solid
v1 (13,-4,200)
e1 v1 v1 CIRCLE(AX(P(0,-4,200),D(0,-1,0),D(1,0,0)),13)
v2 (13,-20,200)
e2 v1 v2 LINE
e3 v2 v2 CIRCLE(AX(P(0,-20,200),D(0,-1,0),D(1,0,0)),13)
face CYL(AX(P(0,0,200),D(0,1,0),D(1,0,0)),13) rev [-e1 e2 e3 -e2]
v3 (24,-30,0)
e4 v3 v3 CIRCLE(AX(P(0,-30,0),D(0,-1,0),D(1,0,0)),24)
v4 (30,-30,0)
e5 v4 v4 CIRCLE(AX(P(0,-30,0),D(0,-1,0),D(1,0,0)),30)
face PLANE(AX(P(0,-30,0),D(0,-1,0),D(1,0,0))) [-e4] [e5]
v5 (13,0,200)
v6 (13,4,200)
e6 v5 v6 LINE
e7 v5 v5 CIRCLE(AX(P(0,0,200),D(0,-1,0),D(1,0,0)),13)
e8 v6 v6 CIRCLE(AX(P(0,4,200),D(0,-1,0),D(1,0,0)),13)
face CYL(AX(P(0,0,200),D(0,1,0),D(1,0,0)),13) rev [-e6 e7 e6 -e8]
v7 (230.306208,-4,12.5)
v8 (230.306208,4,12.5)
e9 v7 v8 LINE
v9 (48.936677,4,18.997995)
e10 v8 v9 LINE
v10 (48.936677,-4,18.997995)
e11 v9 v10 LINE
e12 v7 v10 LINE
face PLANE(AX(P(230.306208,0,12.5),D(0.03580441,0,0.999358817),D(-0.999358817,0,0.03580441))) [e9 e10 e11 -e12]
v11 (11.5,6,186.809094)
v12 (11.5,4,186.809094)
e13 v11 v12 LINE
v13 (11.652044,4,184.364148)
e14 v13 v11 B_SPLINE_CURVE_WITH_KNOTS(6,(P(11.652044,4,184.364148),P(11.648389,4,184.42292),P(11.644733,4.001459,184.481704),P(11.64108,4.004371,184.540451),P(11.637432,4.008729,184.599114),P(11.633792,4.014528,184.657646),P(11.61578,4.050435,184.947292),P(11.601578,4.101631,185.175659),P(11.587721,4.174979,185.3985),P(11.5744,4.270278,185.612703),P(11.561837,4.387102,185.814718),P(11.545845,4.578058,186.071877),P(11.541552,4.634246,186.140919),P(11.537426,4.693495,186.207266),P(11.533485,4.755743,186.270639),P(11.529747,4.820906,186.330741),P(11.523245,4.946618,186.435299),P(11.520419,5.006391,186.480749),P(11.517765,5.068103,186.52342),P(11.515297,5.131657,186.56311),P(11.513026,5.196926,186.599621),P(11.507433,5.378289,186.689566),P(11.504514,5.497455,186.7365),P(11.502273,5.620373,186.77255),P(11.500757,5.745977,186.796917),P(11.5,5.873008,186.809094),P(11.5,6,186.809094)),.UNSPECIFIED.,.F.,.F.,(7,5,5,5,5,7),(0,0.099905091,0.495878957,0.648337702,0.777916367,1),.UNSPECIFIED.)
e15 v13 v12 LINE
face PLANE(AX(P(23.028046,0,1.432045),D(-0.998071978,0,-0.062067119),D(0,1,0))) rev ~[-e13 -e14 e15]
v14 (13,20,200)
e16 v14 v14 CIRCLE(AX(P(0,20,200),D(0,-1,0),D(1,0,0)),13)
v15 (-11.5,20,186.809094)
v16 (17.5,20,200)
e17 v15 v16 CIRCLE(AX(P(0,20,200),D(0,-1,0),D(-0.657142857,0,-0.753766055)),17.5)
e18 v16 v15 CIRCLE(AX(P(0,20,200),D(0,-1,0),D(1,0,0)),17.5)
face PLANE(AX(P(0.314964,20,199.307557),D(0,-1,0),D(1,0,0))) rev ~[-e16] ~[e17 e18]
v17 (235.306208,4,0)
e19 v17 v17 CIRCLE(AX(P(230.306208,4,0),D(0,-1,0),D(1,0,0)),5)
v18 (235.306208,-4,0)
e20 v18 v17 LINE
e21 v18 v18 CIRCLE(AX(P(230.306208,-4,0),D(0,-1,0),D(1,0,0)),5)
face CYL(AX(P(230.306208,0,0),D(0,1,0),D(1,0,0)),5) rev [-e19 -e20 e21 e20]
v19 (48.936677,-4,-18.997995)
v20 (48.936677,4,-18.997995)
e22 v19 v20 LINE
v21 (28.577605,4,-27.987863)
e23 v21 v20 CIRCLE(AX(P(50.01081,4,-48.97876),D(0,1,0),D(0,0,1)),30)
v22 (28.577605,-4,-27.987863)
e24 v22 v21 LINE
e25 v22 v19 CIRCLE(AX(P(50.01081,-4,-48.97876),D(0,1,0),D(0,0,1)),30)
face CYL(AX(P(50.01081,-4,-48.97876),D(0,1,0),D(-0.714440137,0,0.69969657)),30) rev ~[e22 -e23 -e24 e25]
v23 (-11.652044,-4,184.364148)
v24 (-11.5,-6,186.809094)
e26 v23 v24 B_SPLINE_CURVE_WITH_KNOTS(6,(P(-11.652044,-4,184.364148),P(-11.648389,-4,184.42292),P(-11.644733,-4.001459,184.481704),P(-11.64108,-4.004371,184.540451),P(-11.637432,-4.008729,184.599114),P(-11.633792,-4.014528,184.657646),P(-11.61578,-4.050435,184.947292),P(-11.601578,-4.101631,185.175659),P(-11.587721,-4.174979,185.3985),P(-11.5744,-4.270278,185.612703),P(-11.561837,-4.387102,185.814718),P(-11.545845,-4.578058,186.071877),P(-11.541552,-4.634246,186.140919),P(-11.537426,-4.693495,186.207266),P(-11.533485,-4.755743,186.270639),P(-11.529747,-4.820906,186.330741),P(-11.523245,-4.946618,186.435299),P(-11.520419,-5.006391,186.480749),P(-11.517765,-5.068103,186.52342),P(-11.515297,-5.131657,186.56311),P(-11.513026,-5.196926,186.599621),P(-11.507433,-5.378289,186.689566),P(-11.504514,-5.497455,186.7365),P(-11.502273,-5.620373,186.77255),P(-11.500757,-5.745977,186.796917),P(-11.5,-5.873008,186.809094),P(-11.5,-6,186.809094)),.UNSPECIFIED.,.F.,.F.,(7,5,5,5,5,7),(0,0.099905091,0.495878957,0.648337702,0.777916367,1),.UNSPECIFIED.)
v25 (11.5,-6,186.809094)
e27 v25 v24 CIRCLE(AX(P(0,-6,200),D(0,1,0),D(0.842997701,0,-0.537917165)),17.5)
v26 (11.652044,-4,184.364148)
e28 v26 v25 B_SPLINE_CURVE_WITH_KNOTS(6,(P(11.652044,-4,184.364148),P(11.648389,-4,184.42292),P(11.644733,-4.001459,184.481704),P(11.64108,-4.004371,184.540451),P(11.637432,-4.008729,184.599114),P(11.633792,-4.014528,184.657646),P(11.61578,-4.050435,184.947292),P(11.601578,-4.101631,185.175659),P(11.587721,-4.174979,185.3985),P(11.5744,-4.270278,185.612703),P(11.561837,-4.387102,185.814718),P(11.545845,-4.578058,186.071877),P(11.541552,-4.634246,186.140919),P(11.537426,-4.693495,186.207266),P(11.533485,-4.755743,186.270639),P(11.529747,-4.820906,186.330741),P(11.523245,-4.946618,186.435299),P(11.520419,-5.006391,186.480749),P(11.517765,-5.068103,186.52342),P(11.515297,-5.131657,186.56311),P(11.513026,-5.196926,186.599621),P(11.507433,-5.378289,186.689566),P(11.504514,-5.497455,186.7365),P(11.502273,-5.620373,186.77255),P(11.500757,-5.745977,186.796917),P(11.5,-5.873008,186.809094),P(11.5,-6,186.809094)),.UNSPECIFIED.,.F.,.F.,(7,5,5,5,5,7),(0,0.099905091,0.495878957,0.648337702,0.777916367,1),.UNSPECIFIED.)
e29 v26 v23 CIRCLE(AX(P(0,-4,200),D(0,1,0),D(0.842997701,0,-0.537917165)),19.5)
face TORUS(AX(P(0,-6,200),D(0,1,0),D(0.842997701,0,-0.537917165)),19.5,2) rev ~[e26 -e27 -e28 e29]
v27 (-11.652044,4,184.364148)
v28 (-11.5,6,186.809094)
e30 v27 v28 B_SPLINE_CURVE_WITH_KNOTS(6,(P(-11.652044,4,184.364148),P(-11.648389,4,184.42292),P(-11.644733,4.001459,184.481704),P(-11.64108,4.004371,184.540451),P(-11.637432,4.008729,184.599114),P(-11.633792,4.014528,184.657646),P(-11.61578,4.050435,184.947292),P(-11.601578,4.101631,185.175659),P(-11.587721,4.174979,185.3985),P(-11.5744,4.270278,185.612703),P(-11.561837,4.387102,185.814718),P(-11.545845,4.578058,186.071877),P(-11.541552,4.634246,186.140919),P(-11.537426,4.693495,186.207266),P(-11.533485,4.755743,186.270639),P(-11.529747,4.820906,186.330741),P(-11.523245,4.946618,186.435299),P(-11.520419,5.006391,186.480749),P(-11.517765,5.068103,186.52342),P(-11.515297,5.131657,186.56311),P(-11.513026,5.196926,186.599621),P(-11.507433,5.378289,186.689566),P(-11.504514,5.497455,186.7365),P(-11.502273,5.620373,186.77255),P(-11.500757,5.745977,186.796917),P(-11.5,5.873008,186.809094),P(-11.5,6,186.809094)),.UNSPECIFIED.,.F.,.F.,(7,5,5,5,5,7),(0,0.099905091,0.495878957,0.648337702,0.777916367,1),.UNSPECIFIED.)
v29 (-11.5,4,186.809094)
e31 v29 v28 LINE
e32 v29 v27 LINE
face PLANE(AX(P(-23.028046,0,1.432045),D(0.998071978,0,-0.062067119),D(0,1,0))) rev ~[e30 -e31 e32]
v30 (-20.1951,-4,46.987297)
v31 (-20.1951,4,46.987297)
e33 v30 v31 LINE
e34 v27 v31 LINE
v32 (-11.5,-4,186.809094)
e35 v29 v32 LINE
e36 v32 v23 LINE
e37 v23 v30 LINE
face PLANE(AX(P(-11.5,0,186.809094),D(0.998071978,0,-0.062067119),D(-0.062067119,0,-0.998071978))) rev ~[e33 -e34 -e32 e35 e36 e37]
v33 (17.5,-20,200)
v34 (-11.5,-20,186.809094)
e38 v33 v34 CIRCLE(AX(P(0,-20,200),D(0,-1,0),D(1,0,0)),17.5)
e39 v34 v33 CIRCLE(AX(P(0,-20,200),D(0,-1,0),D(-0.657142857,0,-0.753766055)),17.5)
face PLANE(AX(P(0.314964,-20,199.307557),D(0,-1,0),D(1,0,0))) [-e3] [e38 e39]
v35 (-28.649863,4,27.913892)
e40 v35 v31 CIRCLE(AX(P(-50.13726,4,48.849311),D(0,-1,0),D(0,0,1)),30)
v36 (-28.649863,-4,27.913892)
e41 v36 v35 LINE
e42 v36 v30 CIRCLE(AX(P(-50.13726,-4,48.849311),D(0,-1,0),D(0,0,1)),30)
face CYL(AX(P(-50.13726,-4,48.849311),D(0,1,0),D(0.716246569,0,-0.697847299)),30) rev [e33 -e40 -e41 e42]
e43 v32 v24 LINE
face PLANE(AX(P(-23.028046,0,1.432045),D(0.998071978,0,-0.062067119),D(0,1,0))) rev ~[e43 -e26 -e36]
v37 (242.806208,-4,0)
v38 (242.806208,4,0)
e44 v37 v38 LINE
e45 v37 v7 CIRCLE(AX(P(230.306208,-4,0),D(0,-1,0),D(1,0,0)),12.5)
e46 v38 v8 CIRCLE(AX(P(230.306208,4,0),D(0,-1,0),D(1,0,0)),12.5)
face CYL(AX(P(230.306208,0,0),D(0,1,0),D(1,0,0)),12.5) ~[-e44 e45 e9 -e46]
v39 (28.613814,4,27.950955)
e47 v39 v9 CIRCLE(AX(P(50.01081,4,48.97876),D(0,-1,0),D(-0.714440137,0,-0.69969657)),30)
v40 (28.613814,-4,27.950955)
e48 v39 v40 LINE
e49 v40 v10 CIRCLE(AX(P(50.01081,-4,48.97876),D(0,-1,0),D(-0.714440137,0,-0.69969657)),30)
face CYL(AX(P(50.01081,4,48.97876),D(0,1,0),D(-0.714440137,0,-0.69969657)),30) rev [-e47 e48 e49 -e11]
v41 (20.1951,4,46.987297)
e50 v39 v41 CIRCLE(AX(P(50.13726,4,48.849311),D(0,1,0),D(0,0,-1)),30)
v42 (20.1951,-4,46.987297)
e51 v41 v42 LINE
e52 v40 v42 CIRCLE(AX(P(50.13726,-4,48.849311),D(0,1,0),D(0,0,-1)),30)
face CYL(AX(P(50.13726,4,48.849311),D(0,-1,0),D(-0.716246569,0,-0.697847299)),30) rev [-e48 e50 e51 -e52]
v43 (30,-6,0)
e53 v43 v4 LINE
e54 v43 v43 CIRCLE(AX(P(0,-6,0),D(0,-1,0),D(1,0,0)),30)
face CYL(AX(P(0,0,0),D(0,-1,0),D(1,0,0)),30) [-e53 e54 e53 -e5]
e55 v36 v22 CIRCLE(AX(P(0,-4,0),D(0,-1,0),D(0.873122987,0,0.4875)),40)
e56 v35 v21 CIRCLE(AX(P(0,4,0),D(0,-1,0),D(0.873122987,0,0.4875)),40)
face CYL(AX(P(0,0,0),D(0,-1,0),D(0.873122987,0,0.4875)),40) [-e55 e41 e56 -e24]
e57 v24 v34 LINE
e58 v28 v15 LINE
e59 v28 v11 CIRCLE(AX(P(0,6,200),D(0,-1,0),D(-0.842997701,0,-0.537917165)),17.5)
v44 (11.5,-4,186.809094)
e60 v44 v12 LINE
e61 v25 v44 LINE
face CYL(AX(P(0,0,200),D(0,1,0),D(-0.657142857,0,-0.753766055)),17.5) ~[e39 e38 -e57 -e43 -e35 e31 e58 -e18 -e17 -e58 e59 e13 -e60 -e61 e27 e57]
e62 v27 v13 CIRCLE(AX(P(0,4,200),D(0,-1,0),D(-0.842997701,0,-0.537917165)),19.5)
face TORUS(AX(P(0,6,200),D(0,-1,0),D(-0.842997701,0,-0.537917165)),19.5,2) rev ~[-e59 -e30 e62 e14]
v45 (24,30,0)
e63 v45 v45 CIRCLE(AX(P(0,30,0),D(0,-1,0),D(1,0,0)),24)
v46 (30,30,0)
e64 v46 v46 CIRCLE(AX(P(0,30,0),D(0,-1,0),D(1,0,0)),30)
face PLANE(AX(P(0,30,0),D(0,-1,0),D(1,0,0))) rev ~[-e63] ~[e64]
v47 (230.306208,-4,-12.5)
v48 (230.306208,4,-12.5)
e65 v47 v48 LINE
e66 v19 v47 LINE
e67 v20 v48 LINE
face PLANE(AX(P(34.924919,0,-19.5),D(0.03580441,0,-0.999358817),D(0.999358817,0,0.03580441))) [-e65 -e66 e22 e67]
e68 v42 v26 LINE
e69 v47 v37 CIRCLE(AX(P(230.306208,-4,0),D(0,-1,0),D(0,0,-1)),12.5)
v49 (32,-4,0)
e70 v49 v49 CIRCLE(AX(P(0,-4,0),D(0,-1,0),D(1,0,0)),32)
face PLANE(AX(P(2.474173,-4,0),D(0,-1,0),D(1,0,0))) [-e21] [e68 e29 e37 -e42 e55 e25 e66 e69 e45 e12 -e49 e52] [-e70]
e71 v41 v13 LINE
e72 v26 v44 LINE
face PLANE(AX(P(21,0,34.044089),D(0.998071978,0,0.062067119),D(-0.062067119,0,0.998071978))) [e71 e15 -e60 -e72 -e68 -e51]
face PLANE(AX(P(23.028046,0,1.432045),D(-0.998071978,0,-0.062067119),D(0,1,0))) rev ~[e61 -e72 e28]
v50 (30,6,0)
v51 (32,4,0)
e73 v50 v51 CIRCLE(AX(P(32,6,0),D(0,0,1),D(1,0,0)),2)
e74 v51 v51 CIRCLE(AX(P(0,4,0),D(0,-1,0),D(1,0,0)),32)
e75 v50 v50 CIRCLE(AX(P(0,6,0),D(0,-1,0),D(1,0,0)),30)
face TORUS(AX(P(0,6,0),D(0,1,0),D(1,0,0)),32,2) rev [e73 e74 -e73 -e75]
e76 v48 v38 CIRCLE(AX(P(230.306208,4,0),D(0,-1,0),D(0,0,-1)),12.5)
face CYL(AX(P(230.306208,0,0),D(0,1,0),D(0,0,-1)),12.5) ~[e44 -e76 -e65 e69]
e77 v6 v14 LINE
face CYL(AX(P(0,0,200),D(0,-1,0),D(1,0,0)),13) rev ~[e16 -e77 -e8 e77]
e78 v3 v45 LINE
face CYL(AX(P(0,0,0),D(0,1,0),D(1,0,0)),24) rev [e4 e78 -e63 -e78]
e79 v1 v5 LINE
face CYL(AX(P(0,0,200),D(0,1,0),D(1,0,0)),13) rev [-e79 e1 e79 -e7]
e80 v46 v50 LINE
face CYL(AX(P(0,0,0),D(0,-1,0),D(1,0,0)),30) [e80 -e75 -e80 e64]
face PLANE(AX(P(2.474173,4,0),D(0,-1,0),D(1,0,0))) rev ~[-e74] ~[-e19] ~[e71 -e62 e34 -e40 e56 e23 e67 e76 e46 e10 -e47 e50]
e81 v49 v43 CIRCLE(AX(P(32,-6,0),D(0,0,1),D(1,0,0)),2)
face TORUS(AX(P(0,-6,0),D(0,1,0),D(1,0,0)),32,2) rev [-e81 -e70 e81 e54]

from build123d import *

# Parameters (mm, degrees)
F0_R          = 30
F0_R_2        = 5
F0_R_3        = 13
F1_DEPTH      = 4
F2_R          = 30
F3_T1_DEPTH   = 8
F4_R          = 30
F5_R          = 30
F7_DEPTH      = 20
F6_R          = 30
F6_R_2        = 24
F8_DEPTH      = 30
F9_R          = 2
F10_T4_ANGLE  = 114.9160729666
F10_T10_ANGLE = 114.9160729666


# Not quite as in the source:
# - a fillet or chamfer that OpenCascade refuses, or shapes differently, is made with other operations: its cross-section is extruded or revolved along the edge and cut away or added


with BuildPart() as f1:
    # F0 (on Front) → F1 (new body, symmetric)
    with BuildSketch(Plane.XZ):
        with BuildLine():
            ThreePointArc((34.9249194702, -19.5), (38.7104428986, -10.074800772), (40, 0))
            ThreePointArc((40, 0), (38.7104428986, 10.074800772), (34.9249194702, 19.5))
            ThreePointArc((34.9249194702, 19.5), (28.892590505, 27.6625778609), (21, 34.0440890611))
            ThreePointArc((21, 34.0440890611), (0, 40), (-21, 34.0440890611))
            ThreePointArc((-21, 34.0440890611), (-27.6625778609, -28.892590505), (34.9249194702, -19.5))
        make_face()
        Circle(F0_R, mode=Mode.SUBTRACT)
        with BuildLine():
            ThreePointArc((34.9249194702, 19.5), (38.7104428986, 10.074800772), (40, 0))
            ThreePointArc((40, 0), (38.7104428986, -10.074800772), (34.9249194702, -19.5))
            Line((34.9249194702, -19.5), (230.3062081337, -12.5))
            ThreePointArc((230.3062081337, -12.5), (217.8062081337, 0), (230.3062081337, 12.5))
            Line((230.3062081337, 12.5), (34.9249194702, 19.5))
        make_face()
        with BuildLine():
            ThreePointArc((-21, 34.0440890611), (0, 40), (21, 34.0440890611))
            Line((21, 34.0440890611), (11.5, 186.8090940417))
            ThreePointArc((11.5, 186.8090940417), (0, 182.5), (-11.5, 186.8090940417))
            Line((-11.5, 186.8090940417), (-21, 34.0440890611))
        make_face()
        with BuildLine():
            ThreePointArc((242.8062081337, 0), (239.1450428985, 8.8388347648), (230.3062081337, 12.5))
            ThreePointArc((230.3062081337, 12.5), (217.8062081337, 0), (230.3062081337, -12.5))
            ThreePointArc((230.3062081337, -12.5), (239.1450428985, -8.8388347648), (242.8062081337, 0))
        make_face()
        with Locations((230.3062081337, 0)):
            Circle(F0_R_2, mode=Mode.SUBTRACT)
        with BuildLine():
            ThreePointArc((-11.5, 186.8090940417), (0, 182.5), (11.5, 186.8090940417))
            ThreePointArc((11.5, 186.8090940417), (15.9295323221, 192.7543116269), (17.5, 200))
            ThreePointArc((17.5, 200), (-7.2456883731, 215.9295323221), (-11.5, 186.8090940417))
        make_face()
        with Locations((0, 200)):
            Circle(F0_R_3, mode=Mode.SUBTRACT)
    extrude(amount=F1_DEPTH, both=True)

    # F2
    f2_edges = [f1.edges().sort_by_distance(p)[0] for p in [
        (21, 0, 34.044089),
    ]]
    fillet(f2_edges, radius=F2_R)

    # F3: fillet of radius 30 on 1 edges, made by hand

    # F3_s2 → F3_t1 (join)
    with BuildSketch(Plane.XZ.offset(-4)):
        with BuildLine():
            ThreePointArc((28.5776054959, 27.9878628002), (37.8926630157, 21.5351718891), (48.9366773254, 18.9979954035))
            Line((48.9366773254, 18.9979954035), (34.9249194702, 19.5))
            ThreePointArc((34.9249194702, 19.5), (32.033632685, 23.9550908369), (28.5776054959, 27.9878628002))
        make_face()
    extrude(amount=F3_T1_DEPTH)

    # F4
    f4_edges = [f1.edges().sort_by_distance(p)[0] for p in [
        (-21, 0, 34.044089),
    ]]
    fillet(f4_edges, radius=F4_R)

    # F5
    f5_edges = [f1.edges().sort_by_distance(p)[0] for p in [
        (34.924919, 0, -19.5),
    ]]
    fillet(f5_edges, radius=F5_R)

    # F0 (on Front) → F7 (join, symmetric)
    with BuildSketch(Plane.XZ):
        with BuildLine():
            ThreePointArc((-11.5, 186.8090940417), (0, 182.5), (11.5, 186.8090940417))
            ThreePointArc((11.5, 186.8090940417), (15.9295323221, 192.7543116269), (17.5, 200))
            ThreePointArc((17.5, 200), (-7.2456883731, 215.9295323221), (-11.5, 186.8090940417))
        make_face()
        with Locations((0, 200)):
            Circle(F0_R_3, mode=Mode.SUBTRACT)
    extrude(amount=F7_DEPTH, both=True)

    # F6 (on Front) → F8 (join, symmetric)
    with BuildSketch(Plane.XZ):
        Circle(F6_R)
        Circle(F6_R_2, mode=Mode.SUBTRACT)
    extrude(amount=F8_DEPTH, both=True)

    # F9
    f9_edges = [f1.edges().sort_by_distance(p)[0] for p in [
        (-30, -4, 0),
        (-30, 4, 0),
    ]]
    fillet(f9_edges, radius=F9_R)

    # F10: fillet of radius 2 on 2 edges, made by hand


with BuildPart() as f10_tool2:
    # F10_s3 → F10_t4 (revolve)
    with BuildSketch(Plane(origin=(-90.6925867032, 0, 142.1290246396), x_dir=(0, 1, 0), z_dir=(-0.5379171654, 0, 0.8429977006))):
        with BuildLine():
            ThreePointArc((4, -88.0834330744), (4.5857864376, -89.4976466368), (6, -90.0834330744))
            Line((6, -90.0834330744), (4, -90.0834330744))
            Line((4, -90.0834330744), (4, -88.0834330744))
        make_face()
    revolve(axis=Axis((0, 4, 200), (0, -1, 0)), revolution_arc=F10_T4_ANGLE)

    split(bisect_by=Plane(origin=(-23.028045717, 0, 1.4320454762), x_dir=(0, 1, 0), z_dir=(0.9980719777, 0, -0.0620671193)), keep=Keep.TOP)

    split(bisect_by=Plane(origin=(23.028045717, 0, 1.4320454762), x_dir=(0, 1, 0), z_dir=(-0.9980719777, 0, -0.0620671193)), keep=Keep.TOP)


with BuildPart() as f1_1:
    add(f1.part)

    # F10_t1: union F10_tool2
    add(f10_tool2.part)


with BuildPart() as f10_tool8:
    # F10_s9 → F10_t10 (revolve)
    with BuildSketch(Plane(origin=(90.6925867032, 0, 142.1290246396), x_dir=(0, 1, 0), z_dir=(0.5379171654, 0, 0.8429977006))):
        with BuildLine():
            ThreePointArc((-4, 88.0834330744), (-4.5857864376, 89.4976466368), (-6, 90.0834330744))
            Line((-6, 90.0834330744), (-4, 90.0834330744))
            Line((-4, 90.0834330744), (-4, 88.0834330744))
        make_face()
    revolve(axis=Axis((0, -4, 200), (0, 1, 0)), revolution_arc=F10_T10_ANGLE)

    split(bisect_by=Plane(origin=(-23.028045717, 0, 1.4320454762), x_dir=(0, 1, 0), z_dir=(0.9980719777, 0, -0.0620671193)), keep=Keep.TOP)

    split(bisect_by=Plane(origin=(23.028045717, 0, 1.4320454762), x_dir=(0, 1, 0), z_dir=(-0.9980719777, 0, -0.0620671193)), keep=Keep.TOP)


with BuildPart() as f1_2:
    add(f1_1.part)

    # F10_t7: union F10_tool8
    add(f10_tool8.part)


solid = f1_2.part
